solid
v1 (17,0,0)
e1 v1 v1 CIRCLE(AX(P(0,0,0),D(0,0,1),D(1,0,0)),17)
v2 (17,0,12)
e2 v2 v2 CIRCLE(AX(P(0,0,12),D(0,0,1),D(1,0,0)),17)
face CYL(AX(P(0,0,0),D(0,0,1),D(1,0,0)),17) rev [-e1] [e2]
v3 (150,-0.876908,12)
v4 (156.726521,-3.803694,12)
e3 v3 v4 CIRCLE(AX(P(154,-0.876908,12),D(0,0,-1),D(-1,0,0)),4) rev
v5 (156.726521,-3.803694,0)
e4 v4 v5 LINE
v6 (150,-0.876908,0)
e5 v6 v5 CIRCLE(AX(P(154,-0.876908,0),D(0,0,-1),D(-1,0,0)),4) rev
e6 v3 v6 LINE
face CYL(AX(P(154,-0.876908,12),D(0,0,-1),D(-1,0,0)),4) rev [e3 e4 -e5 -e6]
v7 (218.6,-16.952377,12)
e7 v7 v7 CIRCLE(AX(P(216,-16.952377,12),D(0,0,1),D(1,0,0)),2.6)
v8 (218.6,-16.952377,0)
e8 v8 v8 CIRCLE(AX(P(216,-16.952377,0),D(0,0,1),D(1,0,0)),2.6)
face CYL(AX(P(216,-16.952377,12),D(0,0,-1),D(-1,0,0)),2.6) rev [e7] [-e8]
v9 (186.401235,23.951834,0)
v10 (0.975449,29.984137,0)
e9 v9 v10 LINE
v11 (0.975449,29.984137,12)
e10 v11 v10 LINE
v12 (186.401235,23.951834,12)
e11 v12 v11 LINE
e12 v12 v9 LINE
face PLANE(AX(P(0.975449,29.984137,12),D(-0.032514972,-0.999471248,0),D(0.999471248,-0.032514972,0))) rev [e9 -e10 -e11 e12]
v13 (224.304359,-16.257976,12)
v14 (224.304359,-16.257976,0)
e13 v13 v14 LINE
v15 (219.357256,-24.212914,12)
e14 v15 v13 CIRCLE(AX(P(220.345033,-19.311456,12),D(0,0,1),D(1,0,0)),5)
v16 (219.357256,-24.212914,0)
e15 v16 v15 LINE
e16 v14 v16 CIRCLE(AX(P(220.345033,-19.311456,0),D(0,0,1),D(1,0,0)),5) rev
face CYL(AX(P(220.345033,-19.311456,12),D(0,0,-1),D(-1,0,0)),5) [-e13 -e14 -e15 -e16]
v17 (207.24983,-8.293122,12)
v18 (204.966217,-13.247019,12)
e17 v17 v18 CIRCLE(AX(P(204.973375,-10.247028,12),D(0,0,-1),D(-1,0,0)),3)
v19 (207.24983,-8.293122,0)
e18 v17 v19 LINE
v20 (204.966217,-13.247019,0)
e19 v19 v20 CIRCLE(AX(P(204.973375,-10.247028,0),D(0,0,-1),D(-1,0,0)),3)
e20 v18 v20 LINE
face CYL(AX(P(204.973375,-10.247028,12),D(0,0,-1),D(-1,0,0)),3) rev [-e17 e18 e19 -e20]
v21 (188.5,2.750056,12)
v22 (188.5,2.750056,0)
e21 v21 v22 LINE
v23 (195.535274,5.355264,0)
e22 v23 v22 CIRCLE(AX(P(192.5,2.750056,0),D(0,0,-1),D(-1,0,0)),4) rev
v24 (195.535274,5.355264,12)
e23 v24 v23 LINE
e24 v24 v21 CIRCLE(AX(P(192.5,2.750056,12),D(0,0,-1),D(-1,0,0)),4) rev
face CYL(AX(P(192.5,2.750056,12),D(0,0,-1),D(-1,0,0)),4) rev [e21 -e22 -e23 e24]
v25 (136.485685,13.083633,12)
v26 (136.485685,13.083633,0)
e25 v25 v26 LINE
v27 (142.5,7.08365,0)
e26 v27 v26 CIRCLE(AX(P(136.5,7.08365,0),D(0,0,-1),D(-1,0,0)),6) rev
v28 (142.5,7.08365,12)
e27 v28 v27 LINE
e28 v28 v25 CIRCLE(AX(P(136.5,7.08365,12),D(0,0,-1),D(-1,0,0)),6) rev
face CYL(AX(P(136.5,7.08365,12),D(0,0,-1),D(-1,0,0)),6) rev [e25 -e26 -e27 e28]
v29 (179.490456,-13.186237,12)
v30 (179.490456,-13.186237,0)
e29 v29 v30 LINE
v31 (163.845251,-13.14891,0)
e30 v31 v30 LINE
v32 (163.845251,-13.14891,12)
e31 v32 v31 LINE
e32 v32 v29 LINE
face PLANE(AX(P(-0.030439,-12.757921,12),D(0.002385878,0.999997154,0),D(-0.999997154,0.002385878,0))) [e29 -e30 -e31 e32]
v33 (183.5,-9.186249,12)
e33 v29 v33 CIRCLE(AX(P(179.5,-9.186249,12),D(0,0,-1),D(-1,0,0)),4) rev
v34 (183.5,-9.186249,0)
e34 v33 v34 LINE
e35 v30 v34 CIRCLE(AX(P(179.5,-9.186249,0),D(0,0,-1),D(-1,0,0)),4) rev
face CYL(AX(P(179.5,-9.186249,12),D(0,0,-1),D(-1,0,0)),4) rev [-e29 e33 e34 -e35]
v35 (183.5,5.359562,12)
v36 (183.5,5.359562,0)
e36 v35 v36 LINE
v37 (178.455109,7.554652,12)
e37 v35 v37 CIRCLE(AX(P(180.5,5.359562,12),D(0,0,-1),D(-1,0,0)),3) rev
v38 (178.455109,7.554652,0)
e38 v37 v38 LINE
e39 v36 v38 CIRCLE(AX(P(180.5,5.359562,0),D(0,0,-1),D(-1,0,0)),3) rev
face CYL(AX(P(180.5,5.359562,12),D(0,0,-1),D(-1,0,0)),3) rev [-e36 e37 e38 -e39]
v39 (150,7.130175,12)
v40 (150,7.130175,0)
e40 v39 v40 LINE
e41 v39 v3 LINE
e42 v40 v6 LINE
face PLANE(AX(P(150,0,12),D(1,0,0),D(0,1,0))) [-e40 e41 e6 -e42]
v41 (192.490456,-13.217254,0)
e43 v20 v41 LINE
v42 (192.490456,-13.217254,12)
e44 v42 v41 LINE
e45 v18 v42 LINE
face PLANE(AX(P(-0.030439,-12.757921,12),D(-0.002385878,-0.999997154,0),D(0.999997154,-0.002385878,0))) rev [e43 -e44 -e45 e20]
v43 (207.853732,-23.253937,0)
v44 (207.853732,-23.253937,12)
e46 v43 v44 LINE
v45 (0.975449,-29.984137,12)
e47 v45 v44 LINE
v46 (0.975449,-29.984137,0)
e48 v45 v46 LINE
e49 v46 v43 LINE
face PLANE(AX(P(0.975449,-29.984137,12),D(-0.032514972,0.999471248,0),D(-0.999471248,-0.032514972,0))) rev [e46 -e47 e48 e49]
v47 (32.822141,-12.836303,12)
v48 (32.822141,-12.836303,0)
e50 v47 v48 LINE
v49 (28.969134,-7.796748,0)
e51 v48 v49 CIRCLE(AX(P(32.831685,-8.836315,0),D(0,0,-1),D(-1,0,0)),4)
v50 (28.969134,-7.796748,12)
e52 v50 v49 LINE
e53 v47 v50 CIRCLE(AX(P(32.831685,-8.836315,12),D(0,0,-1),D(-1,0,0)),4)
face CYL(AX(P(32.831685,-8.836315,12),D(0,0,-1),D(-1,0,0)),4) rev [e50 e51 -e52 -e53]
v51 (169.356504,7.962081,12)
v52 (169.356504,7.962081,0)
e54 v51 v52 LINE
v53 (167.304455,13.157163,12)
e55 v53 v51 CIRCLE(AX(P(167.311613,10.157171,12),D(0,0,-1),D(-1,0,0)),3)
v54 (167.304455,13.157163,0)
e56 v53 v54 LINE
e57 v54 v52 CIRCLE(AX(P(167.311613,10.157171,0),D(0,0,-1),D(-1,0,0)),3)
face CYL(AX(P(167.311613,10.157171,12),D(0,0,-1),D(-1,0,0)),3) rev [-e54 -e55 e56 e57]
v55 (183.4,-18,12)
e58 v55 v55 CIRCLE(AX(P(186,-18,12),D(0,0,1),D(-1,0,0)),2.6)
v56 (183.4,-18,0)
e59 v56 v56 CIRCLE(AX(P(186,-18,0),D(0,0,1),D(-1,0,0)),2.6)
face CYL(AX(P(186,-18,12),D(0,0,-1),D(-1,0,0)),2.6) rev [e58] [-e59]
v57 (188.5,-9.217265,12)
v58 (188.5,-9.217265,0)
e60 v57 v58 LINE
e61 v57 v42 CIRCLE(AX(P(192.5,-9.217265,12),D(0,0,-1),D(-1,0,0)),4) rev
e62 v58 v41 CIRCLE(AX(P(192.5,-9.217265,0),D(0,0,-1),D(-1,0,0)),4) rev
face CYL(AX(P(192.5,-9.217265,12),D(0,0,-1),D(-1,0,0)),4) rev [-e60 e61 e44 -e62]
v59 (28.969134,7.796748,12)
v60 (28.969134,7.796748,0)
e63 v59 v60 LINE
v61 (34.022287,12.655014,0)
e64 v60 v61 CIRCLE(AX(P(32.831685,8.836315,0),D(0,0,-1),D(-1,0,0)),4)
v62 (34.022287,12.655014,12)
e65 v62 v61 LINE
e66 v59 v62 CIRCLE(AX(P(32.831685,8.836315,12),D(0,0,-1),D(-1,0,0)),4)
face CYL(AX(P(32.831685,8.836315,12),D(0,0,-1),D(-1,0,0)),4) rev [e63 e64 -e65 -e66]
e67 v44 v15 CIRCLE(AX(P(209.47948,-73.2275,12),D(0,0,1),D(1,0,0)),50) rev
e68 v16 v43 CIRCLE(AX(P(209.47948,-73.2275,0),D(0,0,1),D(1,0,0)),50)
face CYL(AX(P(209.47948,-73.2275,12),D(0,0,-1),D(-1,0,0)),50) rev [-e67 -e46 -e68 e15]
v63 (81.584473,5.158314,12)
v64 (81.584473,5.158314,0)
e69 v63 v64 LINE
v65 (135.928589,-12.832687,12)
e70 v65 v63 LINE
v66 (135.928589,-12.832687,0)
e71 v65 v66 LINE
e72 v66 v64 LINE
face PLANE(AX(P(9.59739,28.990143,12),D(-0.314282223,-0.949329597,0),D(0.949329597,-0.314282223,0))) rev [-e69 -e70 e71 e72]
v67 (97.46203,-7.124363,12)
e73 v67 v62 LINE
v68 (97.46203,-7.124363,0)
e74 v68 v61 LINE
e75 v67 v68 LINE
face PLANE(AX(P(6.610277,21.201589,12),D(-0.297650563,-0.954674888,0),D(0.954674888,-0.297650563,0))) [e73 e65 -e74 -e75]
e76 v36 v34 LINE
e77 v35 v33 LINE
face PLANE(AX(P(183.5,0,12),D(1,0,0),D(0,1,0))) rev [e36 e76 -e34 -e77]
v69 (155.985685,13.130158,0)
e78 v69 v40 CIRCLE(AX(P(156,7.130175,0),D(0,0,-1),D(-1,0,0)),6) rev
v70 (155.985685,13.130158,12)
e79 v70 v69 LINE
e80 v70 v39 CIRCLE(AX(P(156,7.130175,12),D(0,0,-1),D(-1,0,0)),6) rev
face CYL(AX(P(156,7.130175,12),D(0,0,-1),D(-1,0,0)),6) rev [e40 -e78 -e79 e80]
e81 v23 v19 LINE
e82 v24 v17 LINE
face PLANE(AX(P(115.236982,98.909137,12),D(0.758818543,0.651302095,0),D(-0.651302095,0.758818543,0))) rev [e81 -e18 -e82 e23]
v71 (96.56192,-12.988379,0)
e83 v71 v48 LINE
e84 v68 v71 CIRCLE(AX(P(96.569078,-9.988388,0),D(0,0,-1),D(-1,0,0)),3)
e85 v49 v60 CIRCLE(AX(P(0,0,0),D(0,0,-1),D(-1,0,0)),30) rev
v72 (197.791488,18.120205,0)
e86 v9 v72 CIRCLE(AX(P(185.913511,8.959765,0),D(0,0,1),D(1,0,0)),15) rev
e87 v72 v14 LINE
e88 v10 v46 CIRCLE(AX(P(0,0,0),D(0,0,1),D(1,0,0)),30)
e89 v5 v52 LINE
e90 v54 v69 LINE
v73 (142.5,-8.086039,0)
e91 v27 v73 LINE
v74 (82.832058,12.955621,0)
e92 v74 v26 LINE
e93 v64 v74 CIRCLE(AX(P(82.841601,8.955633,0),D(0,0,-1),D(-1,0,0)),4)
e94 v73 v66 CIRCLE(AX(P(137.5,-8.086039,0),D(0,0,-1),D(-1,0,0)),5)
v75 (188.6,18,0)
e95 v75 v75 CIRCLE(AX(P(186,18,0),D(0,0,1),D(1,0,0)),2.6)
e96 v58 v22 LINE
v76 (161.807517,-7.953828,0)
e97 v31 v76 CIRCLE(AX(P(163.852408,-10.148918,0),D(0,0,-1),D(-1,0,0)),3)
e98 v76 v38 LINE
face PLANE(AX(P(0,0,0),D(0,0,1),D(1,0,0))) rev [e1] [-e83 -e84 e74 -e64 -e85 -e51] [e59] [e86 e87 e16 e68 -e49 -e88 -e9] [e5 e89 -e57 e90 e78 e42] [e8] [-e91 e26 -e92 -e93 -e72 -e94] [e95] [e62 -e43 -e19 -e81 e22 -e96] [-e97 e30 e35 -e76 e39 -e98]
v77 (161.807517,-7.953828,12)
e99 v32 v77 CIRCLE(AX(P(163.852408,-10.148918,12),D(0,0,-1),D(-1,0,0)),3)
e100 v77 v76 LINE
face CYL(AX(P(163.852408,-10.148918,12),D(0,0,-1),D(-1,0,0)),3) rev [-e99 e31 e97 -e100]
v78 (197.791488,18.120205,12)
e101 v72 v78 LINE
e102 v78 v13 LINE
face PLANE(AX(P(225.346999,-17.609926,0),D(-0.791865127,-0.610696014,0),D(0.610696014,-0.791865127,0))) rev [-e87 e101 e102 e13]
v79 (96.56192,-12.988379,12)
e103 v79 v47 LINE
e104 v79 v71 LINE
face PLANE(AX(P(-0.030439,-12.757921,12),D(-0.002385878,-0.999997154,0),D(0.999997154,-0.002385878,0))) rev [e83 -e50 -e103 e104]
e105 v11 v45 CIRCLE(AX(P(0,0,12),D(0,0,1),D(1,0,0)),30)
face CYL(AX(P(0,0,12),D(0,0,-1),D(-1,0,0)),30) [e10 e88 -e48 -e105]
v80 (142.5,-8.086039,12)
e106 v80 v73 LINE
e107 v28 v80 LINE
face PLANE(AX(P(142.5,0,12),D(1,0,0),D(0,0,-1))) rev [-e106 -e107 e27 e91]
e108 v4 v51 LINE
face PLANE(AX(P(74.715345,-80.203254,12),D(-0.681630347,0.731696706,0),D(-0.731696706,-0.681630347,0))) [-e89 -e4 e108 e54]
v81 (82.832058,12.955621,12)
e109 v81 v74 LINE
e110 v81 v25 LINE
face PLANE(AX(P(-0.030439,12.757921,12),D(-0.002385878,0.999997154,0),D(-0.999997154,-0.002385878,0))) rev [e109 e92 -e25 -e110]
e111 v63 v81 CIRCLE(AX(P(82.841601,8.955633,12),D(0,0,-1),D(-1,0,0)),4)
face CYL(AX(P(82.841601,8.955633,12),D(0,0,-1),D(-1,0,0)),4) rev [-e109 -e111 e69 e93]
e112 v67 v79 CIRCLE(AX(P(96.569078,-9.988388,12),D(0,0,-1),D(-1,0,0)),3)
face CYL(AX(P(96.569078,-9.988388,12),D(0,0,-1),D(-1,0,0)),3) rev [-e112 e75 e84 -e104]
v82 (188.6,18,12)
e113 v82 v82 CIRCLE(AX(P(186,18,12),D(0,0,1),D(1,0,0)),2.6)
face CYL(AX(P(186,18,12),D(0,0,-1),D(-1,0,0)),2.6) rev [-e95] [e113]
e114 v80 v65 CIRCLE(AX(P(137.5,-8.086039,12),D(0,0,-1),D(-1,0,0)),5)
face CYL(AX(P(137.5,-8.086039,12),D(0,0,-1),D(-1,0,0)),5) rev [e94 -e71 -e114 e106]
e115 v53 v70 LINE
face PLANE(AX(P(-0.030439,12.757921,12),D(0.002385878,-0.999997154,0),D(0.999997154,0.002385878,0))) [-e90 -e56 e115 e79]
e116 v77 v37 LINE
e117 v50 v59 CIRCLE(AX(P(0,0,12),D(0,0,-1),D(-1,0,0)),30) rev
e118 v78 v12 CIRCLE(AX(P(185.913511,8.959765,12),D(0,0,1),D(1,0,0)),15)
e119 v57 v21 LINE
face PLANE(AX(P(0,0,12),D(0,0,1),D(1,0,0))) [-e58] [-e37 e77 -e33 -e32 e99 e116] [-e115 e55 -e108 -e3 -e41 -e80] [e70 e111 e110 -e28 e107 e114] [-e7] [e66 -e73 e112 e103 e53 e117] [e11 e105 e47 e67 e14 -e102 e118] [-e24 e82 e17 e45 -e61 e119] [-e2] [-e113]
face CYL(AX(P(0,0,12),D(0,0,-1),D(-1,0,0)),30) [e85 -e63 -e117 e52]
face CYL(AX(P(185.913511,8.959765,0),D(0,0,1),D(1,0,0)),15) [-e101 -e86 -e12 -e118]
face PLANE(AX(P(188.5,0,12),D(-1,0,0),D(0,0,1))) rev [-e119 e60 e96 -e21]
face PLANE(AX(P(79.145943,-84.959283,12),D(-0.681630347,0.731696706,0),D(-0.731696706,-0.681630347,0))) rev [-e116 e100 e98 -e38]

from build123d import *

# Parameters (mm, degrees)
SKETCH_1_R           = 2.6
EXTRUDE_1_DEPTH      = 12
SKETCH_2_R           = 17
CUT_EXTRUDE_1_DEPTH  = 319.424245308
FILLET_1_R           = 50
SKETCH_7_R           = 21
CUT_EXTRUDE_6_DEPTH  = 319.424245308
SKETCH_15_R          = 48
CUT_EXTRUDE_12_DEPTH = 319.424245308
CUT_EXTRUDE_13_DEPTH = 234.372713636
CUT_EXTRUDE_14_DEPTH = 234.372713636
SKETCH_19_W          = 9.577046033
SKETCH_19_H          = 9.102233312
EXTRUDE_3_DEPTH      = 1
CUT_EXTRUDE_16_DEPTH = 234.372713636
FILLET_11_R          = 5
FILLET_12_R          = 15
FILLET_13_R          = 5


with BuildPart() as part:
    # 草图1 → 凸台-拉伸1 (new body)
    with BuildSketch(Plane.XY):
        with BuildLine():
            Line((0.975449173, 29.984137455), (231.02885683, 22.5))
            ThreePointArc((231.02885683, 22.5), (315, 0), (231.02885683, -22.5))
            Line((231.02885683, -22.5), (0.975449173, -29.984137455))
            ThreePointArc((0.975449173, -29.984137455), (-30, 0), (0.975449173, 29.984137455))
        make_face()
        with Locations((186, 18)):
            Circle(SKETCH_1_R, mode=Mode.SUBTRACT)
        with Locations(Location((186, -18, 0), (0, 0, 180))):
            Circle(SKETCH_1_R, mode=Mode.SUBTRACT)
        with Locations((216, -16.952376915)):
            Circle(SKETCH_1_R, mode=Mode.SUBTRACT)
    extrude(amount=EXTRUDE_1_DEPTH)

    # 草图2 → 切除-拉伸1 (cut, through all)
    with BuildSketch(Plane.XY.offset(12)):
        Circle(SKETCH_2_R)
    extrude(amount=-CUT_EXTRUDE_1_DEPTH, mode=Mode.SUBTRACT)

    # Fillet 1
    fillet_1_edges = [part.edges().sort_by_distance(p)[0] for p in [
        (231.02885683, 22.5, 6),
        (231.02885683, -22.5, 6),
    ]]
    fillet(fillet_1_edges, radius=FILLET_1_R)

    # 草图7 → 切除-拉伸6 (cut, through all)
    with BuildSketch(Plane.XY.offset(12)):
        with Locations((270, 0)):
            Circle(SKETCH_7_R)
    extrude(amount=-CUT_EXTRUDE_6_DEPTH, mode=Mode.SUBTRACT)

    # 草图15 → 切除-拉伸12 (cut, through all)
    with BuildSketch(Plane(origin=(0, 0, 0), x_dir=(-1, 0, 0), z_dir=(0, 0, -1))):
        with Locations((-270, 0)):
            Circle(SKETCH_15_R)
    extrude(amount=-CUT_EXTRUDE_12_DEPTH, mode=Mode.SUBTRACT)

    # 草图16 → 切除-拉伸13 (cut, through all)
    with BuildSketch(Plane(origin=(0, 0, 0), x_dir=(-1, 0, 0), z_dir=(0, 0, -1))):
        with BuildLine():
            ThreePointArc((-222, 0), (-224.338232659, 14.798750059), (-231.125125138, 28.155711755))
            ThreePointArc((-231.125125138, 28.155711755), (-223.636221951, 25.273493876), (-215.782692909, 23.62639569))
            ThreePointArc((-215.782692909, 23.62639569), (-220.419657795, 12.215374337), (-222, 0))
        make_face()
    extrude(amount=-CUT_EXTRUDE_13_DEPTH, mode=Mode.SUBTRACT)

    # 草图17 → 切除-拉伸14 (cut, through all)
    with BuildSketch(Plane(origin=(0, 0, 0), x_dir=(-1, 0, 0), z_dir=(0, 0, -1))):
        with BuildLine():
            ThreePointArc((-188.5, 2.750055906), (-191.110952969, 6.501128866), (-195.535274173, 5.355264285))
            Line((-195.535274173, 5.355264285), (-207.249830265, -8.293121713))
            ThreePointArc((-207.249830265, -8.293121713), (-207.697838632, -11.502932426), (-204.966217001, -13.247019458))
            Line((-204.966217001, -13.247019458), (-192.490456487, -13.217253727))
            ThreePointArc((-192.490456487, -13.217253727), (-189.668200744, -12.04231608), (-188.5, -9.217265111))
            Line((-188.5, -9.217265111), (-188.5, 2.750055906))
        make_face()
        with BuildLine():
            ThreePointArc((-178.455108958, 7.554652032), (-181.696939195, 8.110441149), (-183.5, 5.359561914))
            Line((-183.5, 5.359561914), (-183.5, -9.186248604))
            ThreePointArc((-183.5, -9.186248604), (-182.325050968, -12.018047861), (-179.490456487, -13.18623722))
            Line((-179.490456487, -13.18623722), (-163.845250629, -13.148909555))
            ThreePointArc((-163.845250629, -13.148909555), (-161.059570263, -11.244388724), (-161.807517222, -7.953827976))
            Line((-161.807517222, -7.953827976), (-178.455108958, 7.554652032))
        make_face()
        with BuildLine():
            Line((-155.98568473, 13.130157534), (-167.304455128, 13.15716282))
            ThreePointArc((-167.304455128, 13.15716282), (-170.101829155, 11.259302243), (-169.356503805, 7.96208124))
            Line((-169.356503805, 7.96208124), (-156.726521389, -3.803694429))
            ThreePointArc((-156.726521389, -3.803694429), (-152.404081073, -4.544746584), (-150, -0.876907605))
            Line((-150, -0.876907605), (-150, 7.130174611))
            ThreePointArc((-150, 7.130174611), (-151.752301116, 11.367751063), (-155.98568473, 13.130157534))
        make_face()
        with BuildLine():
            ThreePointArc((-136.48568473, 13.083632773), (-140.737576452, 11.331348735), (-142.5, 7.083649851))
            Line((-142.5, 7.083649851), (-142.5, -8.086038582))
            ThreePointArc((-142.5, -8.086038582), (-140.427707672, -12.139250616), (-135.928588884, -12.832686568))
            Line((-135.928588884, -12.832686568), (-81.584472606, 5.158314378))
            ThreePointArc((-81.584472606, 5.158314378), (-78.891840256, 9.587602802), (-82.832057986, 12.955621382))
            Line((-82.832057986, 12.955621382), (-136.48568473, 13.083632773))
        make_face()
        with BuildLine():
            ThreePointArc((-97.462029586, -7.12436313), (-99.534348383, -10.443548142), (-96.561920261, -12.988379256))
            Line((-96.561920261, -12.988379256), (-32.822141486, -12.836303465))
            ThreePointArc((-32.822141486, -12.836303465), (-29.654019481, -11.265809006), (-28.969133823, -7.796748397))
            ThreePointArc((-28.969133823, -7.796748397), (-30, 0), (-28.969133823, 7.796748397))
            ThreePointArc((-28.969133823, 7.796748397), (-30.059408875, 11.719799736), (-34.022287252, 12.655014403))
            Line((-34.022287252, 12.655014403), (-97.462029586, -7.12436313))
        make_face()
    extrude(amount=-CUT_EXTRUDE_14_DEPTH, mode=Mode.SUBTRACT)

    # 草图21 → 切除-拉伸16 (cut, through all)
    with BuildSketch(Plane.XY.offset(12)):
        with BuildLine():
            Line((225.346998742, -17.609925571), (193.471450892, 23.72182406))
            Line((193.471450892, 23.72182406), (207.853731728, 23.253937199))
            ThreePointArc((207.853731728, 23.253937199), (211.825615161, 23.282573441), (215.782692909, 23.62639569))
            ThreePointArc((215.782692909, 23.62639569), (220.419657795, 12.215374337), (222, 0))
            ThreePointArc((222, 0), (222.844172892, -8.962587227), (225.346998742, -17.609925571))
        make_face()
    extrude(amount=-CUT_EXTRUDE_16_DEPTH, mode=Mode.SUBTRACT)

    # 圆角11
    # the kernel refuses this fillet: 5 mm, written as the material it takes off along each edge
    with BuildSketch(Plane(origin=(231.125125138, -28.155711755, -30.280019258), x_dir=(-0.9472337070589926, 0.3205437633323705, 0), z_dir=(0, 0, 1))) as fillet_11_piece_1:
        with BuildLine():
            CenterArc((12.717608088, -4.963189315), FILLET_11_R, 96.956749804, 123.184808142)
            ThreePointArc((8.895338078, -8.186580691), (4.706429893, -3.812127139), (0, 0))
            ThreePointArc((0, 0), (6.056003852, -0.368106853), (12.112007703, 0))
        make_face()
    extrude(amount=72.560038515, mode=Mode.SUBTRACT)

    # 圆角12
    fillet_12_edges = [part.edges().sort_by_distance(p)[0] for p in [
        (193.471450892, 23.72182406, 6),
    ]]
    fillet(fillet_12_edges, radius=FILLET_12_R)

    # 圆角13
    fillet_13_edges = [part.edges().sort_by_distance(p)[0] for p in [
        (225.346030547, -17.608670152, 6),
    ]]
    fillet(fillet_13_edges, radius=FILLET_13_R)


with BuildPart() as body_2:
    # 草图19 → 凸台-拉伸3 (new body)
    with BuildSketch(Plane(origin=(0, 0, 0), x_dir=(0, 0, -1), z_dir=(1, 0, 0))):
        with Locations((4.788523017, -4.551116656)):
            Rectangle(SKETCH_19_W, SKETCH_19_H)
    extrude(amount=EXTRUDE_3_DEPTH)


solid = part.part
